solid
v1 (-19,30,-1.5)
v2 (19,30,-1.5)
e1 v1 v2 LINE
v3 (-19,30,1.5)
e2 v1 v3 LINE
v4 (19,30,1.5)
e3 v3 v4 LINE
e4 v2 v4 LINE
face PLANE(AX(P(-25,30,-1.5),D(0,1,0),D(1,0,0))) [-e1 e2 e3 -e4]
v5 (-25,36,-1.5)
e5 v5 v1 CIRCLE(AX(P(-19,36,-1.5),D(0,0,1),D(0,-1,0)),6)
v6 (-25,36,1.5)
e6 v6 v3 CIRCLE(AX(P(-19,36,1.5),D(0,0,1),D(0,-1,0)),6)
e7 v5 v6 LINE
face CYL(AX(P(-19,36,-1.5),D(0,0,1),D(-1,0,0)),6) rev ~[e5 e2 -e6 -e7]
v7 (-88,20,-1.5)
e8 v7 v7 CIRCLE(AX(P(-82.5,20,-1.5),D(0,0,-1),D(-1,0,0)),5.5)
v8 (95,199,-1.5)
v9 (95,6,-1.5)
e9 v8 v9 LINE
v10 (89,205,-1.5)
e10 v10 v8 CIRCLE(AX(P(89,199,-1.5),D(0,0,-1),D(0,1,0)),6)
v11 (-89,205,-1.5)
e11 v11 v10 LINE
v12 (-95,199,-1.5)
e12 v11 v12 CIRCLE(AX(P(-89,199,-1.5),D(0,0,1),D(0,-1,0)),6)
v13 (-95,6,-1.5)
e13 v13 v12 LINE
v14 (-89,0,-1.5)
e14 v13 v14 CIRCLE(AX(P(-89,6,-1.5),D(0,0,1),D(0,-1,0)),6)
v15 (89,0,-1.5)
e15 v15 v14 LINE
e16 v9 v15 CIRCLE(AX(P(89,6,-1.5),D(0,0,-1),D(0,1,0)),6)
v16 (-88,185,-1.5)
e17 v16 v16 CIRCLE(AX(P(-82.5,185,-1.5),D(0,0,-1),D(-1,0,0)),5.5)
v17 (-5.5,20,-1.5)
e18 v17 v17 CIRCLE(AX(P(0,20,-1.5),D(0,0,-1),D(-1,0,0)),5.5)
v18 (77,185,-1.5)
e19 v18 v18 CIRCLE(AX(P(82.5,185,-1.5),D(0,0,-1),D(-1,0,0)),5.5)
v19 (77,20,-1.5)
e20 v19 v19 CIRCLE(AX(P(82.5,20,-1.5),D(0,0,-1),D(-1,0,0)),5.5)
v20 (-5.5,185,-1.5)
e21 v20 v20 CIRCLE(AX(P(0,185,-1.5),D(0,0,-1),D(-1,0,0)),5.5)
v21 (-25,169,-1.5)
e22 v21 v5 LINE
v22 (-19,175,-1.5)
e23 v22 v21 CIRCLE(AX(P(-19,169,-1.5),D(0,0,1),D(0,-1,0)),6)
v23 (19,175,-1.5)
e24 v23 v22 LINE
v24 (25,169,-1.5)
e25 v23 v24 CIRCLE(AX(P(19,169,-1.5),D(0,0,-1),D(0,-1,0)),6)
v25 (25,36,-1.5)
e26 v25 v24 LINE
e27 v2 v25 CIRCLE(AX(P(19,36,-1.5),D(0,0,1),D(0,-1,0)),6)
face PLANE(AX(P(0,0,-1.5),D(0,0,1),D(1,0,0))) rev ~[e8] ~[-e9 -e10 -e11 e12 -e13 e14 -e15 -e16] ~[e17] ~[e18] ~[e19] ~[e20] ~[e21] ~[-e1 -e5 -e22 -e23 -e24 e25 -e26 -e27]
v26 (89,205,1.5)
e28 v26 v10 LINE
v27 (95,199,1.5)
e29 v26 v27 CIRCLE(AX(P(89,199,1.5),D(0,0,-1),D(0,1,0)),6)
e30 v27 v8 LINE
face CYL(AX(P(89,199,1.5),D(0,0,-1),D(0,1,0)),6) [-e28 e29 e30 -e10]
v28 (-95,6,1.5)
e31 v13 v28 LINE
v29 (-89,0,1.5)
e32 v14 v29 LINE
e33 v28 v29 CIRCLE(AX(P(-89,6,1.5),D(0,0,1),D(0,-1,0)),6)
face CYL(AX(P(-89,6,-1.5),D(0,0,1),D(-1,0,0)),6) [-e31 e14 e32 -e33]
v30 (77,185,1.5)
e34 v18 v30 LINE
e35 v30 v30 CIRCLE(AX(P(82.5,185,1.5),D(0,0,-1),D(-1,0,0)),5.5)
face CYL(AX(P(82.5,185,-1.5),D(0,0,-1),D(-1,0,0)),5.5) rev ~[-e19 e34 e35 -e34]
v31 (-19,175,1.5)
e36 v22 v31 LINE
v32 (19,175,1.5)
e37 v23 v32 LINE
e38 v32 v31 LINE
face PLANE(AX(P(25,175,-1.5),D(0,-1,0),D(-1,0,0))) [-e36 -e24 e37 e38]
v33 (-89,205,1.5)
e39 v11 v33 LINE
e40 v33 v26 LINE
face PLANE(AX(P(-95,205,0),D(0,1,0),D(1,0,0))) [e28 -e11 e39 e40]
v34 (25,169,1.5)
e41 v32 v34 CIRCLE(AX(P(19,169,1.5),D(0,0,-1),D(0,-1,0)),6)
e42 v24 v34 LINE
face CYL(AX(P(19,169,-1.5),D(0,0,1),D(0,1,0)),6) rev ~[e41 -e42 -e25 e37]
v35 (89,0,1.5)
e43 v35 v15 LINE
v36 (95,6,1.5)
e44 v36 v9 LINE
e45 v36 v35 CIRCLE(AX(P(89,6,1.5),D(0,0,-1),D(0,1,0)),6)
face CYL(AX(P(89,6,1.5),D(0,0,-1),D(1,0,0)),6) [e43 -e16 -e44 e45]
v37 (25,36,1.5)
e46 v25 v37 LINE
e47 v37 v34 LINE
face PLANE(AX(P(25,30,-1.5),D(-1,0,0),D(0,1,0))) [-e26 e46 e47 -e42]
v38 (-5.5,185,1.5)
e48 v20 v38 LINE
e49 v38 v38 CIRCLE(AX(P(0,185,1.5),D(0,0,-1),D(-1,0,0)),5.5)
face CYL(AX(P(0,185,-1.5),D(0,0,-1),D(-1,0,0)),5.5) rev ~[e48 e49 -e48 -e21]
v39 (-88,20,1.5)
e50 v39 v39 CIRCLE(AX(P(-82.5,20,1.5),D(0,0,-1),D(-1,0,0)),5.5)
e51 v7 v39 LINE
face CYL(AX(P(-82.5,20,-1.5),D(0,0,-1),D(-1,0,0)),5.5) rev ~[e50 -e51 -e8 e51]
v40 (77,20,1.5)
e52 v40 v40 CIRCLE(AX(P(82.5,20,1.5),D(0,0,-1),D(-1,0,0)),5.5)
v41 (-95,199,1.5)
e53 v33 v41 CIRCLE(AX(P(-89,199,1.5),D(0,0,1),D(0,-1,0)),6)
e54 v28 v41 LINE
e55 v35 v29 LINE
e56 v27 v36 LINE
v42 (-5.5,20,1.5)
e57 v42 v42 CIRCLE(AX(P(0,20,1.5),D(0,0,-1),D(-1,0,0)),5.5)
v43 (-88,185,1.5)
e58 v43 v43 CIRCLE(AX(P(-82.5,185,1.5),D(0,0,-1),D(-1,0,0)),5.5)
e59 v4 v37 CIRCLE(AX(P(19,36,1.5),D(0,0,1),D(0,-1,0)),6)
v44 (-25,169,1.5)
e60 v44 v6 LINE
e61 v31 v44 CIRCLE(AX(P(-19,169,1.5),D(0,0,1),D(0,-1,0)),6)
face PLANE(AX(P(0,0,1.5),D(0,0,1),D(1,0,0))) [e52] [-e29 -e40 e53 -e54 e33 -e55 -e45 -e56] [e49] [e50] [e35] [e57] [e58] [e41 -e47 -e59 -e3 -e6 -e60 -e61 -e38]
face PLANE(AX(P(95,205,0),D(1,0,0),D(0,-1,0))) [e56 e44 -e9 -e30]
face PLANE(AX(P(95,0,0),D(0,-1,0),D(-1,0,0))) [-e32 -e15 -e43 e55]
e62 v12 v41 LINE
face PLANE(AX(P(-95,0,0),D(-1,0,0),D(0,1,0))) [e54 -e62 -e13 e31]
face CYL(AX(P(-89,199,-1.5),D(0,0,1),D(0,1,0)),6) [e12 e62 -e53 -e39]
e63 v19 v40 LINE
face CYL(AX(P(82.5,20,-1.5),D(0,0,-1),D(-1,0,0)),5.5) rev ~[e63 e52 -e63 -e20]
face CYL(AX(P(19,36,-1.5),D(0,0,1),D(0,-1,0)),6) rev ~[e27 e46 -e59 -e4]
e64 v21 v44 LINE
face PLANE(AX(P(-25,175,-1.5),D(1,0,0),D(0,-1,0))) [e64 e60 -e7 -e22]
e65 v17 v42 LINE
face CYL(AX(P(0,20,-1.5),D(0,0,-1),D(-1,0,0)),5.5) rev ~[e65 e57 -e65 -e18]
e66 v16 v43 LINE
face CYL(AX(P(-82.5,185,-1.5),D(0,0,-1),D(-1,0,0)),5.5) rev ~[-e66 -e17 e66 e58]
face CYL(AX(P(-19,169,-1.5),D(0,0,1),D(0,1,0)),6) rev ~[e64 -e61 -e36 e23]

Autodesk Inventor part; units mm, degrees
ref_plane "YZ Plane" through (0, 0, 0) normal (1, 0, 0) x (0, 1, 0)
ref_plane "XZ Plane" through (0, 0, 0) normal (0, 1, 0) x (-1, 0, 0)
ref_plane "XY Plane" through (0, 0, 0) normal (0, 0, 1) x (1, 0, 0)
sketch "Sketch1" plane through (0, 0, 0) normal (0, 0, 1) x (1, 0, 0)
  line L0 (-95, 205) -> (95, 205)
  line L1 (95, 205) -> (95, 0)
  line L2 (95, 0) -> (-95, 0)
  line L3 (-95, 0) -> (-95, 205)
  point P0 (0, 0)
  point P1 (0, 0)
  point P2 (0, 0)
  point P3 (0, 0)
  point P4 (0, 0)
  dimension "d27" = 190
  dimension "d29" = 205
extrude "Plate1" add sketch "Sketch1" along normal mid plane 3
sketch "Sketch4" plane through (0, 0, -1.5) normal (0, 0, -1) x (-1, 0, 0)
  line L0 (95, 205) -> (-95, 205) construction
  line L1 (-95, 205) -> (-95, 0) construction
  line L2 (-95, 0) -> (95, 0) construction
  line L3 (95, 0) -> (95, 205) construction
  line L4 (-25, 175) -> (25, 175)
  line L5 (25, 175) -> (25, 30)
  line L6 (25, 30) -> (-25, 30)
  line L7 (-25, 30) -> (-25, 175)
  line L8 (-25, 175) -> (25, 30) construction
  line L9 (25, 175) -> (-25, 30) construction
  circle A0 centre (0, 185) radius 5.5
  circle A1 centre (0, 20) radius 5.5
  circle A2 centre (82.5, 20) radius 5.5
  circle A3 centre (82.5, 185) radius 5.5
  circle A4 centre (-82.5, 185) radius 5.5
  circle A5 centre (-82.5, 20) radius 5.5
  line L10 (0, 175) -> (0, 30) construction
  line L11 (-25, 102.5) -> (25, 102.5) construction
  point P0 (0, 0)
  point P1 (0, 102.5)
  point P2 (95, 102.5)
  point P3 (0, 205)
  point P4 (0, 102.5)
  dimension "d51" = 50
  dimension "d52" = 145
  dimension "d53" = 11
  dimension "d54" = 165
  dimension "d70" = 165
  dimension "d71" = 165
extrude "Cut1" cut sketch "Sketch4" against normal blind 3
fillet "Corner Round1" radius 6 8 edges at (95, 205, 0) (95, 0, 0) (-95, 0, 0) (-95, 205, 0) (25, 30, 0) (-25, 30, 0) (25, 175, 0) (-25, 175, 0)
equation "\"d71\" = d70"
equation "\"d57\" = Thickness"
equation "\"d15\" = Thickness"
equation "\"BendRadius\" = Thickness"
equation "\"BendReliefWidth\" = Thickness"
equation "\"BendReliefDepth\" = 0.5 * Thickness"
equation "\"CornerReliefSize\" = 4 * Thickness"
equation "\"MinimumRemnant\" = 2 * Thickness"
equation "\"TransitionRadius\" = BendRadius"
equation "\"JacobiRadiusSize\" = BendRadius"
equation "\"GapSize\" = Thickness"
equation "\"d68\" = 145"
equation "\"Thickness\" = 3"
properties part number "DMF 2.1 01 42 Gear way 2"
